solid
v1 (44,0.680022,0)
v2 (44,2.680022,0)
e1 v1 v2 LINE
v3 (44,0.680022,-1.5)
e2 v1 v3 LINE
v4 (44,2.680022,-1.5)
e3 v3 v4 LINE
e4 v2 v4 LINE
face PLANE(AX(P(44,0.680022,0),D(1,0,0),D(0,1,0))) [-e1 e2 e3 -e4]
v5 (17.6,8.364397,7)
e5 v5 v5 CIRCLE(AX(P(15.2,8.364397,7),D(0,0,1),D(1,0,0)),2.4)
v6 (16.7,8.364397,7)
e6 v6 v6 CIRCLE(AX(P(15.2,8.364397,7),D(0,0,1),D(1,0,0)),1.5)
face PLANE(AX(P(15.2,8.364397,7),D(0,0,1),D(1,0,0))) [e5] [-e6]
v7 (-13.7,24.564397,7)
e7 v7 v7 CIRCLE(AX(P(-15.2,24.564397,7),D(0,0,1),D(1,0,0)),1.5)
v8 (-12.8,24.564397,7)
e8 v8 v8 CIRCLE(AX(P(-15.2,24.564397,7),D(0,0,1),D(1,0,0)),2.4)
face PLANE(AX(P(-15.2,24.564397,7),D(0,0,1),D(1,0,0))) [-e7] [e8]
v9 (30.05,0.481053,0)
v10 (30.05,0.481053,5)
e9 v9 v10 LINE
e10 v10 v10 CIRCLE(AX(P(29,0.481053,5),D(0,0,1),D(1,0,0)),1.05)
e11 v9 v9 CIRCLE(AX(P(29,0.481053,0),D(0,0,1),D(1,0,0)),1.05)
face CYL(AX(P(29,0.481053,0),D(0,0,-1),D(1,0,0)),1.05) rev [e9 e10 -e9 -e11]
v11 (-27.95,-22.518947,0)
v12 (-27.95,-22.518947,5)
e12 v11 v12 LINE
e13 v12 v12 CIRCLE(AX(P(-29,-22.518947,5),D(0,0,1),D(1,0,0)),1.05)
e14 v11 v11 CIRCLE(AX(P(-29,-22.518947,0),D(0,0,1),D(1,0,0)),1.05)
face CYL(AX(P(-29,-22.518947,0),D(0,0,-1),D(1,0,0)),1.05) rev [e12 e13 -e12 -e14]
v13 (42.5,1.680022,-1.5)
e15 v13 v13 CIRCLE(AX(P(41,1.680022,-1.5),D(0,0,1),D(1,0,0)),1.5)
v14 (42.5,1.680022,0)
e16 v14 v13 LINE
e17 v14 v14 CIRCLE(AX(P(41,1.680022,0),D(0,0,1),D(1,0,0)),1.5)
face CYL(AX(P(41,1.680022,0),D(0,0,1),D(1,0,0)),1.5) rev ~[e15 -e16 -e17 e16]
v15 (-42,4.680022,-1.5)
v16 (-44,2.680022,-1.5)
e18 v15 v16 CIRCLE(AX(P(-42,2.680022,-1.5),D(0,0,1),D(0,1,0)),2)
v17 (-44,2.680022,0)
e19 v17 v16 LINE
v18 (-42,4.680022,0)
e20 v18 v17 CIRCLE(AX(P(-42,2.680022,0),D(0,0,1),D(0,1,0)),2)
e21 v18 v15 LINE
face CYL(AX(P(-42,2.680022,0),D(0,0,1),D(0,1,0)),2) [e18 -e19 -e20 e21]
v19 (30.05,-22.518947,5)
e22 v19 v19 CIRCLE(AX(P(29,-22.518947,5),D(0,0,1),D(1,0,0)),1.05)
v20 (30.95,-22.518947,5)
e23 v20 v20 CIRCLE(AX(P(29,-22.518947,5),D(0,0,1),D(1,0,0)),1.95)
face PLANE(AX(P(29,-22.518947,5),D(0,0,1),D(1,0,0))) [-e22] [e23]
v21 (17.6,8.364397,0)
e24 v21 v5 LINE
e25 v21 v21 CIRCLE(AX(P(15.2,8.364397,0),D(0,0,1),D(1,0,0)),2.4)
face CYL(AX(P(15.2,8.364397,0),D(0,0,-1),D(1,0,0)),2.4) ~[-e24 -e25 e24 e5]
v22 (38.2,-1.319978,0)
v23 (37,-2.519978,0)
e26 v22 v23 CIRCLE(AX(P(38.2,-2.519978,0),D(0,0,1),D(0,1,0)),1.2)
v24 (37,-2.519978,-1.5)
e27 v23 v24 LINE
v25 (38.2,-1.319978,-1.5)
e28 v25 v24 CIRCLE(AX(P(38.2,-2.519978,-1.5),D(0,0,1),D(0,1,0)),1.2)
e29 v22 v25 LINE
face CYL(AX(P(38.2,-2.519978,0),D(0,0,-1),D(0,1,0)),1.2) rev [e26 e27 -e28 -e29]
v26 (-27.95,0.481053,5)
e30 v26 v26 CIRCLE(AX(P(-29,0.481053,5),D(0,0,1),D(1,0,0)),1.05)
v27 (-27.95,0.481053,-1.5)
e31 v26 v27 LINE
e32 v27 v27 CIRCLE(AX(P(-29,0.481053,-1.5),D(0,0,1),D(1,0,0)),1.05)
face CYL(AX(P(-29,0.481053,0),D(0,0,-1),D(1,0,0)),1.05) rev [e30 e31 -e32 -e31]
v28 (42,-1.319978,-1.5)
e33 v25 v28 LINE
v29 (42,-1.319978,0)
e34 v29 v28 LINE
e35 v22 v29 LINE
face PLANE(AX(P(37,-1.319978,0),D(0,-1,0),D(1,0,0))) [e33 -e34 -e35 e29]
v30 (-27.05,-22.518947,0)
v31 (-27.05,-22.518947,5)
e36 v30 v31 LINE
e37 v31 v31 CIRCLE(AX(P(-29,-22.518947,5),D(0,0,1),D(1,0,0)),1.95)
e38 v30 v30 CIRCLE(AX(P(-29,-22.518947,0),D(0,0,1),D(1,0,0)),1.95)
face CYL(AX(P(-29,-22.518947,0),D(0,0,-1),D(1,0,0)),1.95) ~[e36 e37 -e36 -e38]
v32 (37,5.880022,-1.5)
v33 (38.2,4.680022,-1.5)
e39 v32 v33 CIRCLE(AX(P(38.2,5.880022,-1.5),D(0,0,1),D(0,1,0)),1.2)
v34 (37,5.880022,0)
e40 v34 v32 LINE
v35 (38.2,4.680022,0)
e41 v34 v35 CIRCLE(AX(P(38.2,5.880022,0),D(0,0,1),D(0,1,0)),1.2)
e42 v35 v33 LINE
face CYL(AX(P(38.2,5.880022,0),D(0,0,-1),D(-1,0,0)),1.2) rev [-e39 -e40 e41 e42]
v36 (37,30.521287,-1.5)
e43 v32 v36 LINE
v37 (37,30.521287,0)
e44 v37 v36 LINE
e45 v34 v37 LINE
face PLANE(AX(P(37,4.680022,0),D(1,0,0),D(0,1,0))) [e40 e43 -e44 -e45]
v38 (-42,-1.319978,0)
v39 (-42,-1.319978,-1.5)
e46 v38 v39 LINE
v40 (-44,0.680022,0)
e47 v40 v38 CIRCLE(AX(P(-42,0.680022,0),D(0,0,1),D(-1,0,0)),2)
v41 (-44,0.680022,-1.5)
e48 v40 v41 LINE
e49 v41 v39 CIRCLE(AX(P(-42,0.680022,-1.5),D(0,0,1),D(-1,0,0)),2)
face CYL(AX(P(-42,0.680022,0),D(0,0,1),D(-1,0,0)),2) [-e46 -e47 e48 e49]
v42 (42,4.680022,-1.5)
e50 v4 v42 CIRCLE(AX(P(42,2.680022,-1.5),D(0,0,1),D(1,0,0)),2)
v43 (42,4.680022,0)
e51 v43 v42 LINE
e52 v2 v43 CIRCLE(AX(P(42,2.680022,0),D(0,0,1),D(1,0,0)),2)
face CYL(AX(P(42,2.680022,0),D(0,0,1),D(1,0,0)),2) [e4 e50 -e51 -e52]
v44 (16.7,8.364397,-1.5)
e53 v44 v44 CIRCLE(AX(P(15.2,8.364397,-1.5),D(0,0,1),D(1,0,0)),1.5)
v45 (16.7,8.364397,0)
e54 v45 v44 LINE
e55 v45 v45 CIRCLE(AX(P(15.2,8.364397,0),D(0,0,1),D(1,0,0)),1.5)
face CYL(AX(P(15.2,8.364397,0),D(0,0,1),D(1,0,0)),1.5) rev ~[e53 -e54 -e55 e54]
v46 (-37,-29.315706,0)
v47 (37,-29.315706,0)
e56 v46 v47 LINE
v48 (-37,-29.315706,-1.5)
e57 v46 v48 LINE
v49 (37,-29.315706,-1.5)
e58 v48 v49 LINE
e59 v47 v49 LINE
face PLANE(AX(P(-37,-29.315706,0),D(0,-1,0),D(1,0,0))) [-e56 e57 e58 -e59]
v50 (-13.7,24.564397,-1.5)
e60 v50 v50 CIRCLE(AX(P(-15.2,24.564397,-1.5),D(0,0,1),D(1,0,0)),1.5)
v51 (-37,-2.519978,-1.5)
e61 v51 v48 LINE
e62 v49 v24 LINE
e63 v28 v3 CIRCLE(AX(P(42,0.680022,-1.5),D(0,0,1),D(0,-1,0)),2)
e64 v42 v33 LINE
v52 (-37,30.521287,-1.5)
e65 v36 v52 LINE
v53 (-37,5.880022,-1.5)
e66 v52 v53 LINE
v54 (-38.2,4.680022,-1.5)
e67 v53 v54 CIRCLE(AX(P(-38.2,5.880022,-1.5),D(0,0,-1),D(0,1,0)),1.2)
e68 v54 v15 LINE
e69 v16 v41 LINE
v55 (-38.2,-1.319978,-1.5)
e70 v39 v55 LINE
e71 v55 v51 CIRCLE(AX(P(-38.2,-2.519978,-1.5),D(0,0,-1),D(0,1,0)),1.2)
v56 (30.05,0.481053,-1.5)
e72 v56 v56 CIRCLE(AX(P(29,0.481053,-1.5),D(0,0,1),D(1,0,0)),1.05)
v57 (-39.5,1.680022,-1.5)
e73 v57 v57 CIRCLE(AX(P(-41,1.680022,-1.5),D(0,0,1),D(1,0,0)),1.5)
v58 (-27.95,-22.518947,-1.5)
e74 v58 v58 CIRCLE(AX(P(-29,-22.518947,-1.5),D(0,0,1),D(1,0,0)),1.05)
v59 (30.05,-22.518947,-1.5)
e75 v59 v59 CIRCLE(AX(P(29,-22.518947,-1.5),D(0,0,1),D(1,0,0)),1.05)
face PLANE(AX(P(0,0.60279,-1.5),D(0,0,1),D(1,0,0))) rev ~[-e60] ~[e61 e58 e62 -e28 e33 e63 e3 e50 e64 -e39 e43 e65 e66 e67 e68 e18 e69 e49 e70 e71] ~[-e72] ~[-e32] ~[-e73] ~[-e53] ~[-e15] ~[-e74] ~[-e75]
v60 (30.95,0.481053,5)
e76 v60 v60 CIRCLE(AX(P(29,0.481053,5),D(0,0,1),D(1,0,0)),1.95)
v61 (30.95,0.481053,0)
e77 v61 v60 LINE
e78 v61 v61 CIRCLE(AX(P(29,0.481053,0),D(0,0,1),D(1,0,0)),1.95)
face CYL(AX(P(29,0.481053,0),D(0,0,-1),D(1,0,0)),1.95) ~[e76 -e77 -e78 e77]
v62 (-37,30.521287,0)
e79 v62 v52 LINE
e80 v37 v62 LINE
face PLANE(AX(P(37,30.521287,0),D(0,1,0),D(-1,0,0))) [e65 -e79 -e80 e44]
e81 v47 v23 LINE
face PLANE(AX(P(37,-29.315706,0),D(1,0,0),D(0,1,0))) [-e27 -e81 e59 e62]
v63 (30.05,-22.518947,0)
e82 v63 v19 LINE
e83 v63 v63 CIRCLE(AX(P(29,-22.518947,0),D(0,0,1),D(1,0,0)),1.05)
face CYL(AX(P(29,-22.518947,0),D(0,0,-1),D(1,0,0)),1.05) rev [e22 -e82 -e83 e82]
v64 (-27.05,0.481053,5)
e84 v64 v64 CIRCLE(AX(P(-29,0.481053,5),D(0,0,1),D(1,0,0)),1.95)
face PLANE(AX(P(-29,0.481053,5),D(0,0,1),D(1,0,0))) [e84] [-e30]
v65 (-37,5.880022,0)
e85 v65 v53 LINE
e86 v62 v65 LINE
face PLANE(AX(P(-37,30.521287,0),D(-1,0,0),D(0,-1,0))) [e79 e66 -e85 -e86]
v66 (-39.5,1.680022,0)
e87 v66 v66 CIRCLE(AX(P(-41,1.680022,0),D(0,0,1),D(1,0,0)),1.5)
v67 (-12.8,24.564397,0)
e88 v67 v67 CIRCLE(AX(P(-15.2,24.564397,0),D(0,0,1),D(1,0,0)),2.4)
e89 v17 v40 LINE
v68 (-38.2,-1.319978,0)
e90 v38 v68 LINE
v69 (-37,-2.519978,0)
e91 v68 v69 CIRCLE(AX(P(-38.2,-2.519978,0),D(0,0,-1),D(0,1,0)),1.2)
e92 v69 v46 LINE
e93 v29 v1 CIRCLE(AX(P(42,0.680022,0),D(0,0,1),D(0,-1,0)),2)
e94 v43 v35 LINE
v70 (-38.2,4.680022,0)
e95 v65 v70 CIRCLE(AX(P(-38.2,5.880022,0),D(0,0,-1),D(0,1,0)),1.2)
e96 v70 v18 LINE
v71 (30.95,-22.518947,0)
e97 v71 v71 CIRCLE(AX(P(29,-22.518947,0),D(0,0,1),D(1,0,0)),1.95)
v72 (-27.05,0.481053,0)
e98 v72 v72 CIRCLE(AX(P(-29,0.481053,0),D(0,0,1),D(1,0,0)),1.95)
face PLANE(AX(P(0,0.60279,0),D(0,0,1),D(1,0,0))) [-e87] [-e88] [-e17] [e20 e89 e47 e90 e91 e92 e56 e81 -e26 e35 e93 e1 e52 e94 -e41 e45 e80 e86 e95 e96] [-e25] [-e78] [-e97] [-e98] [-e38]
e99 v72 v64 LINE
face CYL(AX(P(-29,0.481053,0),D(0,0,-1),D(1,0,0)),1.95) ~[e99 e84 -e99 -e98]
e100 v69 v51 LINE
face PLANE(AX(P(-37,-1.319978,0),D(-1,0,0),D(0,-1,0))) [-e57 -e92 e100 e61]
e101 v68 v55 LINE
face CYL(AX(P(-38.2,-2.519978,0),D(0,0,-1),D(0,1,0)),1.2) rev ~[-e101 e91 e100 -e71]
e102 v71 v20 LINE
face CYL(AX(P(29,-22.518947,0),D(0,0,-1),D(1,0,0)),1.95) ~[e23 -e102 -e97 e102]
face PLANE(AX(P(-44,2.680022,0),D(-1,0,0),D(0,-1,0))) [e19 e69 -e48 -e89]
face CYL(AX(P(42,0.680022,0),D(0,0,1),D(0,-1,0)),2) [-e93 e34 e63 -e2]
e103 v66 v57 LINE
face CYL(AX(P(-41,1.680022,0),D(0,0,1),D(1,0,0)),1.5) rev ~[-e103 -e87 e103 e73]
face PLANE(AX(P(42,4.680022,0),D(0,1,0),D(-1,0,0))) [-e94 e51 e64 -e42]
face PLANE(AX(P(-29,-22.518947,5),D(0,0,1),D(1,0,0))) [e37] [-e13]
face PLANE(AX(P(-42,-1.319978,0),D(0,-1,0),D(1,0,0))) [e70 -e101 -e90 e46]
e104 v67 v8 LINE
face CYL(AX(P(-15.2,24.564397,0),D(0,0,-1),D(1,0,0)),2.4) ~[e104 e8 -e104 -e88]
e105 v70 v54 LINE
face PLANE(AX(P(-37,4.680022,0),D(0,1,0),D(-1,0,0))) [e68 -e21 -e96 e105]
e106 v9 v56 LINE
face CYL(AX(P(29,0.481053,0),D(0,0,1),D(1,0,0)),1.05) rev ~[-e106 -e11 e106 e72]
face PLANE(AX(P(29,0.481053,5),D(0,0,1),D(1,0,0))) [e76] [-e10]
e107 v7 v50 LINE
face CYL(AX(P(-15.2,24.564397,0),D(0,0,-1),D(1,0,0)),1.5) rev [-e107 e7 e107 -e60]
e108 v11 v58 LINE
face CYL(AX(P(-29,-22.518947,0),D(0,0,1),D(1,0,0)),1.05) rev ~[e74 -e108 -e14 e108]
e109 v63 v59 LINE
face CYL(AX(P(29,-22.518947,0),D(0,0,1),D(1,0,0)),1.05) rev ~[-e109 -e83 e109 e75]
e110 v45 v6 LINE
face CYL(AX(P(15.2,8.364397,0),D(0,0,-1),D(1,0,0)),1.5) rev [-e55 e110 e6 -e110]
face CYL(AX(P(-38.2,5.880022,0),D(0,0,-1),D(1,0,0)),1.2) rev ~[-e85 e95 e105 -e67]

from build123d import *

# Parameters (mm, degrees)
F0_R     = 1.05
F0_R_2   = 1.5
F1_DEPTH = 1.5
F3_R     = 1.2
F4_R     = 1.95
F4_R_2   = 1.05
F5_DEPTH = 5
F4_R_3   = 2.4
F4_R_4   = 1.5
F6_DEPTH = 7


with BuildPart() as f1:
    # F0 (on Top) → F1 (new body)
    with BuildSketch(Plane.XY):
        Polygon((37, 30.5212866254), (-37, 30.5212866254), (-37, 4.6800224319), (-37, -1.3199775681), (-37, -29.3157063685), (37, -29.3157063685), (37, -1.3199775681), (37, 4.6800224319), align=None)
        with Locations((-29, -22.5189467669)):
            Circle(F0_R, mode=Mode.SUBTRACT)
        with Locations((-29, 0.4810532331)):
            Circle(F0_R, mode=Mode.SUBTRACT)
        with Locations((29, -22.5189467669)):
            Circle(F0_R, mode=Mode.SUBTRACT)
        with Locations((29, 0.4810532331)):
            Circle(F0_R, mode=Mode.SUBTRACT)
        with Locations((-15.2, 24.5643973112)):
            Circle(F0_R_2, mode=Mode.SUBTRACT)
        with Locations((15.2, 8.3643973112)):
            Circle(F0_R_2, mode=Mode.SUBTRACT)
        with BuildLine():
            Line((-37, -1.3199775681), (-37, 4.6800224319))
            Line((-37, 4.6800224319), (-42, 4.6800224319))
            ThreePointArc((-42, 4.6800224319), (-43.4142135624, 4.0942359942), (-44, 2.6800224319))
            Line((-44, 2.6800224319), (-44, 0.6800224319))
            ThreePointArc((-44, 0.6800224319), (-43.4142135624, -0.7341911305), (-42, -1.3199775681))
            Line((-42, -1.3199775681), (-37, -1.3199775681))
        make_face()
        with Locations((-41, 1.6800224319)):
            Circle(F0_R_2, mode=Mode.SUBTRACT)
        with BuildLine():
            Line((42, 4.6800224319), (37, 4.6800224319))
            Line((37, 4.6800224319), (37, -1.3199775681))
            Line((37, -1.3199775681), (42, -1.3199775681))
            ThreePointArc((42, -1.3199775681), (43.4142135624, -0.7341911305), (44, 0.6800224319))
            Line((44, 0.6800224319), (44, 2.6800224319))
            ThreePointArc((44, 2.6800224319), (43.4142135624, 4.0942359942), (42, 4.6800224319))
        make_face()
        with Locations((41, 1.6800224319)):
            Circle(F0_R_2, mode=Mode.SUBTRACT)
    extrude(amount=-F1_DEPTH)

    # F3
    f3_edges = [f1.edges().sort_by_distance(p)[0] for p in [
        (-37, -1.319978, -0.75),
        (-37, 4.680022, -0.75),
        (37, -1.319978, -0.75),
        (37, 4.680022, -0.75),
    ]]
    fillet(f3_edges, radius=F3_R)

    # F4 (on face) → F5 (join)
    with BuildSketch(Plane.XY):
        with Locations((-29, 0.4810532331)):
            Circle(F4_R)
        with Locations((-29, 0.4810532331)):
            Circle(F4_R_2, mode=Mode.SUBTRACT)
        with Locations((-29, -22.5189467669)):
            Circle(F4_R)
        with Locations((-29, -22.5189467669)):
            Circle(F4_R_2, mode=Mode.SUBTRACT)
        with Locations((29, -22.5189467669)):
            Circle(F4_R)
        with Locations((29, -22.5189467669)):
            Circle(F4_R_2, mode=Mode.SUBTRACT)
        with Locations((29, 0.4810532331)):
            Circle(F4_R)
        with Locations((29, 0.4810532331)):
            Circle(F4_R_2, mode=Mode.SUBTRACT)
    extrude(amount=F5_DEPTH)

    # F4 (on face) → F6 (join)
    with BuildSketch(Plane.XY):
        with Locations((-15.2, 24.5643973112)):
            Circle(F4_R_3)
        with Locations((-15.2, 24.5643973112)):
            Circle(F4_R_4, mode=Mode.SUBTRACT)
        with Locations((15.2, 8.3643973112)):
            Circle(F4_R_3)
        with Locations((15.2, 8.3643973112)):
            Circle(F4_R_4, mode=Mode.SUBTRACT)
    extrude(amount=F6_DEPTH)


solid = f1.part
